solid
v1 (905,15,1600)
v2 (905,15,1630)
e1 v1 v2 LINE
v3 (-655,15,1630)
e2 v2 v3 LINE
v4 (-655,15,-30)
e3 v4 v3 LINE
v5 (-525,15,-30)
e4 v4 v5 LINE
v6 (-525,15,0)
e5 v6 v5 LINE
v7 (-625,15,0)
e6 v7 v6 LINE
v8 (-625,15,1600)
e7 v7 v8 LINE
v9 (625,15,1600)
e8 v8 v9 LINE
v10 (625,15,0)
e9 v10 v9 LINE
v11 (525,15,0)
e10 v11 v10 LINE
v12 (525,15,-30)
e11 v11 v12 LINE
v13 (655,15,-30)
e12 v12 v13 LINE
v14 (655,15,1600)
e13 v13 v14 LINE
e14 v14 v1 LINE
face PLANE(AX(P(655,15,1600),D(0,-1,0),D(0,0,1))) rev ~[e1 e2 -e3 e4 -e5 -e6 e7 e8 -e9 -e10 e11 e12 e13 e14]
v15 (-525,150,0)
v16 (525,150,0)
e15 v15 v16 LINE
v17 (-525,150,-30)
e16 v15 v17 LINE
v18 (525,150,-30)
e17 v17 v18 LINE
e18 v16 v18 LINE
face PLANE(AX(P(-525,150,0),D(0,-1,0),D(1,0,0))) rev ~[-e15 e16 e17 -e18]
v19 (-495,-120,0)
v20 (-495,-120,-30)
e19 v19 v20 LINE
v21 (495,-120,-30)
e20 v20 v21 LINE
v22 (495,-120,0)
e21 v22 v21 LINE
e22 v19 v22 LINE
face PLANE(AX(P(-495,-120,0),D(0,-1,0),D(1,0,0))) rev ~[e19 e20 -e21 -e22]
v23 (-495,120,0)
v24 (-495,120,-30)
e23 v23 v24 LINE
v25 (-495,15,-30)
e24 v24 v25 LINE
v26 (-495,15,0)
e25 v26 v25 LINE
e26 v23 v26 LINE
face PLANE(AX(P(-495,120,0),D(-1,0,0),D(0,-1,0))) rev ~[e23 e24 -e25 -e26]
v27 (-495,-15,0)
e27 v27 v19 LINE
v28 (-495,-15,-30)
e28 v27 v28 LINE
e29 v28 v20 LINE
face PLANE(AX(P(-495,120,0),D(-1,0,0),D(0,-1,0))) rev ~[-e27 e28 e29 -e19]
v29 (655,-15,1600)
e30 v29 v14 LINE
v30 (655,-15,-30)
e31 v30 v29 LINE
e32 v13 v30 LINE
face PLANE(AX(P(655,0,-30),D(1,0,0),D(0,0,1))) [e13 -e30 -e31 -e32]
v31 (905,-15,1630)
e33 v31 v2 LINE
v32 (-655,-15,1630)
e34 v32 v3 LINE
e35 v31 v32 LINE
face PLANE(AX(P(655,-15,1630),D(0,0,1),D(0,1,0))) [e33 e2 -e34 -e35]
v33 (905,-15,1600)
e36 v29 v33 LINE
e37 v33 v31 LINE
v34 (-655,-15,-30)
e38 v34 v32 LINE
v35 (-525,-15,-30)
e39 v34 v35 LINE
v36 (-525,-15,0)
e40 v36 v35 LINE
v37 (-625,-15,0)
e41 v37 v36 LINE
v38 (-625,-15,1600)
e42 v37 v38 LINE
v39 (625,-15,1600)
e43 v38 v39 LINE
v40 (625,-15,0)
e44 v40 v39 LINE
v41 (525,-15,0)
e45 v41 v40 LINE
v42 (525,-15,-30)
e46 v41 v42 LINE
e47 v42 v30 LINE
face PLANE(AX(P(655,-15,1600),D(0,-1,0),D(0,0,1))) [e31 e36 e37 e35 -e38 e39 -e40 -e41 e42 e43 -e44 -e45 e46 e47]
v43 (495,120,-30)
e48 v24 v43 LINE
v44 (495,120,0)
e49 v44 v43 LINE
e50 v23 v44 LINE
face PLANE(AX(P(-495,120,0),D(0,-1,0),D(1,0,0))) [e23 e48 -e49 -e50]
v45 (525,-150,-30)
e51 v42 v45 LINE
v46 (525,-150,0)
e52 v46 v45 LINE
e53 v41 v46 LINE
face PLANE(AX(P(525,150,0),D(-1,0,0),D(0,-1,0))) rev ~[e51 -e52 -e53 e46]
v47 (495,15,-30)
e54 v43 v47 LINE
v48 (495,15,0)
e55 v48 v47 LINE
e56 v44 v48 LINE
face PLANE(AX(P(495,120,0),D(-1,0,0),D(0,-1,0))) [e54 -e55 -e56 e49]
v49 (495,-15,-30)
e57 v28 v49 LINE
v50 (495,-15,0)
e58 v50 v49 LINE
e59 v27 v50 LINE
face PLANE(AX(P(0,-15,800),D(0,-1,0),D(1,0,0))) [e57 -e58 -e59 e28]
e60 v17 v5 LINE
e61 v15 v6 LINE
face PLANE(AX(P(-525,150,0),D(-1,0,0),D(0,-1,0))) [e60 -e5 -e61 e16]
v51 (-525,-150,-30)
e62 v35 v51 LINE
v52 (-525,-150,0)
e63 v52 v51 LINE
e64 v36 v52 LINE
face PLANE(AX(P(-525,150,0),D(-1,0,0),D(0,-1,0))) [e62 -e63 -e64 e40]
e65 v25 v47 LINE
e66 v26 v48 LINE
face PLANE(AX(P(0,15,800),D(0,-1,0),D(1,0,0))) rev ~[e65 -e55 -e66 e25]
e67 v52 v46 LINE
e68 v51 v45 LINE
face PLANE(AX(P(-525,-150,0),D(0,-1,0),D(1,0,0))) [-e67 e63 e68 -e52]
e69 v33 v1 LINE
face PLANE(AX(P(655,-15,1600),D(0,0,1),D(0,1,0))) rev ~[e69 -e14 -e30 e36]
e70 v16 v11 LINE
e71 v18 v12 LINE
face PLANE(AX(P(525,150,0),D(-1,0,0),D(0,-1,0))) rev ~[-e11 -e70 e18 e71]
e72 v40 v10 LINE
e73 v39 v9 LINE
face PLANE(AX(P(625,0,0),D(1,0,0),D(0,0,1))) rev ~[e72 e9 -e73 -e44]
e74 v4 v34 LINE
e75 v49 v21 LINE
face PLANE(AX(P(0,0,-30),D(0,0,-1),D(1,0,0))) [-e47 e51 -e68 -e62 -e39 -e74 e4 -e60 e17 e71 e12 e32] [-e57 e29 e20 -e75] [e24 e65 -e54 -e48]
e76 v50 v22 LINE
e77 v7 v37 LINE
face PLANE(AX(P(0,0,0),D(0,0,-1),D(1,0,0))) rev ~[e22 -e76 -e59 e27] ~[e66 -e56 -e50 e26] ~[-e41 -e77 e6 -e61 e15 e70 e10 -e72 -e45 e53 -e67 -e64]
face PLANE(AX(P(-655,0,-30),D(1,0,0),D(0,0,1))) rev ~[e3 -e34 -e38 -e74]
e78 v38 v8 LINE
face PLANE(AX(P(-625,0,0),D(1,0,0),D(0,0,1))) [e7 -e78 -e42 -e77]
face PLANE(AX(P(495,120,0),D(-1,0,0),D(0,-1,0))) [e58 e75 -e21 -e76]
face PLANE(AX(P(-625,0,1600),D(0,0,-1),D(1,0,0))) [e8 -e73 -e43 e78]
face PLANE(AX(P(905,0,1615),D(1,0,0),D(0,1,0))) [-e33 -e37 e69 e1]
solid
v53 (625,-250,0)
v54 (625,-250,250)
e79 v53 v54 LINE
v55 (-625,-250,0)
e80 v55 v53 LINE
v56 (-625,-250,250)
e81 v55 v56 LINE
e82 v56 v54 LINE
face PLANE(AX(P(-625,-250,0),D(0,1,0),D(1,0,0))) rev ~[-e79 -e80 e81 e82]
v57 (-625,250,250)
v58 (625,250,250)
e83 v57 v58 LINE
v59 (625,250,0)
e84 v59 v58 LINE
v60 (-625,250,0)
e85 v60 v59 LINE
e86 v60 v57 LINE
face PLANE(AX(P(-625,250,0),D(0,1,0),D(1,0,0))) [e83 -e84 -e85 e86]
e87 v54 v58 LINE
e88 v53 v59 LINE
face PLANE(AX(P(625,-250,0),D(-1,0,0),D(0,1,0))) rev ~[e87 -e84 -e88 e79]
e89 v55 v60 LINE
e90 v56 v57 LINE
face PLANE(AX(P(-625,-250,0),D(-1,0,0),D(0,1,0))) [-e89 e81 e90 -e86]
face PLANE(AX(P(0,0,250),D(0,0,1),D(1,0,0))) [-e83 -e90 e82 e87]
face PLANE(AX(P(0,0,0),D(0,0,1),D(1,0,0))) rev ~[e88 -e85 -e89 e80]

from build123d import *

# Parameters (mm, degrees)
F0_W     = 1250
F0_H     = 500
F1_DEPTH = 250
F2_W     = 1310
F2_H     = 1660
F2_W_2   = 1250
F2_H_2   = 1600
F3_DEPTH = 15
F4_W     = 1050
F4_H     = 300
F4_W_2   = 990
F4_H_2   = 240
F5_DEPTH = 30
F6_W     = 30
F6_H     = 30
F7_DEPTH = 250


with BuildPart() as f1:
    # F0 (on Top) → F1 (new body)
    with BuildSketch(Plane.XY):
        Rectangle(F0_W, F0_H)
    extrude(amount=F1_DEPTH)


with BuildPart() as f3:
    # F2 (on Front) → F3 (new body, symmetric)
    with BuildSketch(Plane.XZ):
        with Locations((0, 800)):
            Rectangle(F2_W, F2_H)
        with Locations((0, 800)):
            Rectangle(F2_W_2, F2_H_2, mode=Mode.SUBTRACT)
    extrude(amount=F3_DEPTH, both=True)

    # F4 (on face) → F5 (join)
    with BuildSketch(Plane(origin=(0, 0, 0), x_dir=(1, 0, 0), z_dir=(0, 0, -1))):
        Rectangle(F4_W, F4_H)
        Rectangle(F4_W_2, F4_H_2, mode=Mode.SUBTRACT)
    extrude(amount=F5_DEPTH)

    # F6 (on face) → F7 (join)
    with BuildSketch(Plane.YZ.offset(655)):
        with Locations((0, 1615)):
            Rectangle(F6_W, F6_H)
    extrude(amount=F7_DEPTH)


solid = Compound([f1.part, f3.part])
